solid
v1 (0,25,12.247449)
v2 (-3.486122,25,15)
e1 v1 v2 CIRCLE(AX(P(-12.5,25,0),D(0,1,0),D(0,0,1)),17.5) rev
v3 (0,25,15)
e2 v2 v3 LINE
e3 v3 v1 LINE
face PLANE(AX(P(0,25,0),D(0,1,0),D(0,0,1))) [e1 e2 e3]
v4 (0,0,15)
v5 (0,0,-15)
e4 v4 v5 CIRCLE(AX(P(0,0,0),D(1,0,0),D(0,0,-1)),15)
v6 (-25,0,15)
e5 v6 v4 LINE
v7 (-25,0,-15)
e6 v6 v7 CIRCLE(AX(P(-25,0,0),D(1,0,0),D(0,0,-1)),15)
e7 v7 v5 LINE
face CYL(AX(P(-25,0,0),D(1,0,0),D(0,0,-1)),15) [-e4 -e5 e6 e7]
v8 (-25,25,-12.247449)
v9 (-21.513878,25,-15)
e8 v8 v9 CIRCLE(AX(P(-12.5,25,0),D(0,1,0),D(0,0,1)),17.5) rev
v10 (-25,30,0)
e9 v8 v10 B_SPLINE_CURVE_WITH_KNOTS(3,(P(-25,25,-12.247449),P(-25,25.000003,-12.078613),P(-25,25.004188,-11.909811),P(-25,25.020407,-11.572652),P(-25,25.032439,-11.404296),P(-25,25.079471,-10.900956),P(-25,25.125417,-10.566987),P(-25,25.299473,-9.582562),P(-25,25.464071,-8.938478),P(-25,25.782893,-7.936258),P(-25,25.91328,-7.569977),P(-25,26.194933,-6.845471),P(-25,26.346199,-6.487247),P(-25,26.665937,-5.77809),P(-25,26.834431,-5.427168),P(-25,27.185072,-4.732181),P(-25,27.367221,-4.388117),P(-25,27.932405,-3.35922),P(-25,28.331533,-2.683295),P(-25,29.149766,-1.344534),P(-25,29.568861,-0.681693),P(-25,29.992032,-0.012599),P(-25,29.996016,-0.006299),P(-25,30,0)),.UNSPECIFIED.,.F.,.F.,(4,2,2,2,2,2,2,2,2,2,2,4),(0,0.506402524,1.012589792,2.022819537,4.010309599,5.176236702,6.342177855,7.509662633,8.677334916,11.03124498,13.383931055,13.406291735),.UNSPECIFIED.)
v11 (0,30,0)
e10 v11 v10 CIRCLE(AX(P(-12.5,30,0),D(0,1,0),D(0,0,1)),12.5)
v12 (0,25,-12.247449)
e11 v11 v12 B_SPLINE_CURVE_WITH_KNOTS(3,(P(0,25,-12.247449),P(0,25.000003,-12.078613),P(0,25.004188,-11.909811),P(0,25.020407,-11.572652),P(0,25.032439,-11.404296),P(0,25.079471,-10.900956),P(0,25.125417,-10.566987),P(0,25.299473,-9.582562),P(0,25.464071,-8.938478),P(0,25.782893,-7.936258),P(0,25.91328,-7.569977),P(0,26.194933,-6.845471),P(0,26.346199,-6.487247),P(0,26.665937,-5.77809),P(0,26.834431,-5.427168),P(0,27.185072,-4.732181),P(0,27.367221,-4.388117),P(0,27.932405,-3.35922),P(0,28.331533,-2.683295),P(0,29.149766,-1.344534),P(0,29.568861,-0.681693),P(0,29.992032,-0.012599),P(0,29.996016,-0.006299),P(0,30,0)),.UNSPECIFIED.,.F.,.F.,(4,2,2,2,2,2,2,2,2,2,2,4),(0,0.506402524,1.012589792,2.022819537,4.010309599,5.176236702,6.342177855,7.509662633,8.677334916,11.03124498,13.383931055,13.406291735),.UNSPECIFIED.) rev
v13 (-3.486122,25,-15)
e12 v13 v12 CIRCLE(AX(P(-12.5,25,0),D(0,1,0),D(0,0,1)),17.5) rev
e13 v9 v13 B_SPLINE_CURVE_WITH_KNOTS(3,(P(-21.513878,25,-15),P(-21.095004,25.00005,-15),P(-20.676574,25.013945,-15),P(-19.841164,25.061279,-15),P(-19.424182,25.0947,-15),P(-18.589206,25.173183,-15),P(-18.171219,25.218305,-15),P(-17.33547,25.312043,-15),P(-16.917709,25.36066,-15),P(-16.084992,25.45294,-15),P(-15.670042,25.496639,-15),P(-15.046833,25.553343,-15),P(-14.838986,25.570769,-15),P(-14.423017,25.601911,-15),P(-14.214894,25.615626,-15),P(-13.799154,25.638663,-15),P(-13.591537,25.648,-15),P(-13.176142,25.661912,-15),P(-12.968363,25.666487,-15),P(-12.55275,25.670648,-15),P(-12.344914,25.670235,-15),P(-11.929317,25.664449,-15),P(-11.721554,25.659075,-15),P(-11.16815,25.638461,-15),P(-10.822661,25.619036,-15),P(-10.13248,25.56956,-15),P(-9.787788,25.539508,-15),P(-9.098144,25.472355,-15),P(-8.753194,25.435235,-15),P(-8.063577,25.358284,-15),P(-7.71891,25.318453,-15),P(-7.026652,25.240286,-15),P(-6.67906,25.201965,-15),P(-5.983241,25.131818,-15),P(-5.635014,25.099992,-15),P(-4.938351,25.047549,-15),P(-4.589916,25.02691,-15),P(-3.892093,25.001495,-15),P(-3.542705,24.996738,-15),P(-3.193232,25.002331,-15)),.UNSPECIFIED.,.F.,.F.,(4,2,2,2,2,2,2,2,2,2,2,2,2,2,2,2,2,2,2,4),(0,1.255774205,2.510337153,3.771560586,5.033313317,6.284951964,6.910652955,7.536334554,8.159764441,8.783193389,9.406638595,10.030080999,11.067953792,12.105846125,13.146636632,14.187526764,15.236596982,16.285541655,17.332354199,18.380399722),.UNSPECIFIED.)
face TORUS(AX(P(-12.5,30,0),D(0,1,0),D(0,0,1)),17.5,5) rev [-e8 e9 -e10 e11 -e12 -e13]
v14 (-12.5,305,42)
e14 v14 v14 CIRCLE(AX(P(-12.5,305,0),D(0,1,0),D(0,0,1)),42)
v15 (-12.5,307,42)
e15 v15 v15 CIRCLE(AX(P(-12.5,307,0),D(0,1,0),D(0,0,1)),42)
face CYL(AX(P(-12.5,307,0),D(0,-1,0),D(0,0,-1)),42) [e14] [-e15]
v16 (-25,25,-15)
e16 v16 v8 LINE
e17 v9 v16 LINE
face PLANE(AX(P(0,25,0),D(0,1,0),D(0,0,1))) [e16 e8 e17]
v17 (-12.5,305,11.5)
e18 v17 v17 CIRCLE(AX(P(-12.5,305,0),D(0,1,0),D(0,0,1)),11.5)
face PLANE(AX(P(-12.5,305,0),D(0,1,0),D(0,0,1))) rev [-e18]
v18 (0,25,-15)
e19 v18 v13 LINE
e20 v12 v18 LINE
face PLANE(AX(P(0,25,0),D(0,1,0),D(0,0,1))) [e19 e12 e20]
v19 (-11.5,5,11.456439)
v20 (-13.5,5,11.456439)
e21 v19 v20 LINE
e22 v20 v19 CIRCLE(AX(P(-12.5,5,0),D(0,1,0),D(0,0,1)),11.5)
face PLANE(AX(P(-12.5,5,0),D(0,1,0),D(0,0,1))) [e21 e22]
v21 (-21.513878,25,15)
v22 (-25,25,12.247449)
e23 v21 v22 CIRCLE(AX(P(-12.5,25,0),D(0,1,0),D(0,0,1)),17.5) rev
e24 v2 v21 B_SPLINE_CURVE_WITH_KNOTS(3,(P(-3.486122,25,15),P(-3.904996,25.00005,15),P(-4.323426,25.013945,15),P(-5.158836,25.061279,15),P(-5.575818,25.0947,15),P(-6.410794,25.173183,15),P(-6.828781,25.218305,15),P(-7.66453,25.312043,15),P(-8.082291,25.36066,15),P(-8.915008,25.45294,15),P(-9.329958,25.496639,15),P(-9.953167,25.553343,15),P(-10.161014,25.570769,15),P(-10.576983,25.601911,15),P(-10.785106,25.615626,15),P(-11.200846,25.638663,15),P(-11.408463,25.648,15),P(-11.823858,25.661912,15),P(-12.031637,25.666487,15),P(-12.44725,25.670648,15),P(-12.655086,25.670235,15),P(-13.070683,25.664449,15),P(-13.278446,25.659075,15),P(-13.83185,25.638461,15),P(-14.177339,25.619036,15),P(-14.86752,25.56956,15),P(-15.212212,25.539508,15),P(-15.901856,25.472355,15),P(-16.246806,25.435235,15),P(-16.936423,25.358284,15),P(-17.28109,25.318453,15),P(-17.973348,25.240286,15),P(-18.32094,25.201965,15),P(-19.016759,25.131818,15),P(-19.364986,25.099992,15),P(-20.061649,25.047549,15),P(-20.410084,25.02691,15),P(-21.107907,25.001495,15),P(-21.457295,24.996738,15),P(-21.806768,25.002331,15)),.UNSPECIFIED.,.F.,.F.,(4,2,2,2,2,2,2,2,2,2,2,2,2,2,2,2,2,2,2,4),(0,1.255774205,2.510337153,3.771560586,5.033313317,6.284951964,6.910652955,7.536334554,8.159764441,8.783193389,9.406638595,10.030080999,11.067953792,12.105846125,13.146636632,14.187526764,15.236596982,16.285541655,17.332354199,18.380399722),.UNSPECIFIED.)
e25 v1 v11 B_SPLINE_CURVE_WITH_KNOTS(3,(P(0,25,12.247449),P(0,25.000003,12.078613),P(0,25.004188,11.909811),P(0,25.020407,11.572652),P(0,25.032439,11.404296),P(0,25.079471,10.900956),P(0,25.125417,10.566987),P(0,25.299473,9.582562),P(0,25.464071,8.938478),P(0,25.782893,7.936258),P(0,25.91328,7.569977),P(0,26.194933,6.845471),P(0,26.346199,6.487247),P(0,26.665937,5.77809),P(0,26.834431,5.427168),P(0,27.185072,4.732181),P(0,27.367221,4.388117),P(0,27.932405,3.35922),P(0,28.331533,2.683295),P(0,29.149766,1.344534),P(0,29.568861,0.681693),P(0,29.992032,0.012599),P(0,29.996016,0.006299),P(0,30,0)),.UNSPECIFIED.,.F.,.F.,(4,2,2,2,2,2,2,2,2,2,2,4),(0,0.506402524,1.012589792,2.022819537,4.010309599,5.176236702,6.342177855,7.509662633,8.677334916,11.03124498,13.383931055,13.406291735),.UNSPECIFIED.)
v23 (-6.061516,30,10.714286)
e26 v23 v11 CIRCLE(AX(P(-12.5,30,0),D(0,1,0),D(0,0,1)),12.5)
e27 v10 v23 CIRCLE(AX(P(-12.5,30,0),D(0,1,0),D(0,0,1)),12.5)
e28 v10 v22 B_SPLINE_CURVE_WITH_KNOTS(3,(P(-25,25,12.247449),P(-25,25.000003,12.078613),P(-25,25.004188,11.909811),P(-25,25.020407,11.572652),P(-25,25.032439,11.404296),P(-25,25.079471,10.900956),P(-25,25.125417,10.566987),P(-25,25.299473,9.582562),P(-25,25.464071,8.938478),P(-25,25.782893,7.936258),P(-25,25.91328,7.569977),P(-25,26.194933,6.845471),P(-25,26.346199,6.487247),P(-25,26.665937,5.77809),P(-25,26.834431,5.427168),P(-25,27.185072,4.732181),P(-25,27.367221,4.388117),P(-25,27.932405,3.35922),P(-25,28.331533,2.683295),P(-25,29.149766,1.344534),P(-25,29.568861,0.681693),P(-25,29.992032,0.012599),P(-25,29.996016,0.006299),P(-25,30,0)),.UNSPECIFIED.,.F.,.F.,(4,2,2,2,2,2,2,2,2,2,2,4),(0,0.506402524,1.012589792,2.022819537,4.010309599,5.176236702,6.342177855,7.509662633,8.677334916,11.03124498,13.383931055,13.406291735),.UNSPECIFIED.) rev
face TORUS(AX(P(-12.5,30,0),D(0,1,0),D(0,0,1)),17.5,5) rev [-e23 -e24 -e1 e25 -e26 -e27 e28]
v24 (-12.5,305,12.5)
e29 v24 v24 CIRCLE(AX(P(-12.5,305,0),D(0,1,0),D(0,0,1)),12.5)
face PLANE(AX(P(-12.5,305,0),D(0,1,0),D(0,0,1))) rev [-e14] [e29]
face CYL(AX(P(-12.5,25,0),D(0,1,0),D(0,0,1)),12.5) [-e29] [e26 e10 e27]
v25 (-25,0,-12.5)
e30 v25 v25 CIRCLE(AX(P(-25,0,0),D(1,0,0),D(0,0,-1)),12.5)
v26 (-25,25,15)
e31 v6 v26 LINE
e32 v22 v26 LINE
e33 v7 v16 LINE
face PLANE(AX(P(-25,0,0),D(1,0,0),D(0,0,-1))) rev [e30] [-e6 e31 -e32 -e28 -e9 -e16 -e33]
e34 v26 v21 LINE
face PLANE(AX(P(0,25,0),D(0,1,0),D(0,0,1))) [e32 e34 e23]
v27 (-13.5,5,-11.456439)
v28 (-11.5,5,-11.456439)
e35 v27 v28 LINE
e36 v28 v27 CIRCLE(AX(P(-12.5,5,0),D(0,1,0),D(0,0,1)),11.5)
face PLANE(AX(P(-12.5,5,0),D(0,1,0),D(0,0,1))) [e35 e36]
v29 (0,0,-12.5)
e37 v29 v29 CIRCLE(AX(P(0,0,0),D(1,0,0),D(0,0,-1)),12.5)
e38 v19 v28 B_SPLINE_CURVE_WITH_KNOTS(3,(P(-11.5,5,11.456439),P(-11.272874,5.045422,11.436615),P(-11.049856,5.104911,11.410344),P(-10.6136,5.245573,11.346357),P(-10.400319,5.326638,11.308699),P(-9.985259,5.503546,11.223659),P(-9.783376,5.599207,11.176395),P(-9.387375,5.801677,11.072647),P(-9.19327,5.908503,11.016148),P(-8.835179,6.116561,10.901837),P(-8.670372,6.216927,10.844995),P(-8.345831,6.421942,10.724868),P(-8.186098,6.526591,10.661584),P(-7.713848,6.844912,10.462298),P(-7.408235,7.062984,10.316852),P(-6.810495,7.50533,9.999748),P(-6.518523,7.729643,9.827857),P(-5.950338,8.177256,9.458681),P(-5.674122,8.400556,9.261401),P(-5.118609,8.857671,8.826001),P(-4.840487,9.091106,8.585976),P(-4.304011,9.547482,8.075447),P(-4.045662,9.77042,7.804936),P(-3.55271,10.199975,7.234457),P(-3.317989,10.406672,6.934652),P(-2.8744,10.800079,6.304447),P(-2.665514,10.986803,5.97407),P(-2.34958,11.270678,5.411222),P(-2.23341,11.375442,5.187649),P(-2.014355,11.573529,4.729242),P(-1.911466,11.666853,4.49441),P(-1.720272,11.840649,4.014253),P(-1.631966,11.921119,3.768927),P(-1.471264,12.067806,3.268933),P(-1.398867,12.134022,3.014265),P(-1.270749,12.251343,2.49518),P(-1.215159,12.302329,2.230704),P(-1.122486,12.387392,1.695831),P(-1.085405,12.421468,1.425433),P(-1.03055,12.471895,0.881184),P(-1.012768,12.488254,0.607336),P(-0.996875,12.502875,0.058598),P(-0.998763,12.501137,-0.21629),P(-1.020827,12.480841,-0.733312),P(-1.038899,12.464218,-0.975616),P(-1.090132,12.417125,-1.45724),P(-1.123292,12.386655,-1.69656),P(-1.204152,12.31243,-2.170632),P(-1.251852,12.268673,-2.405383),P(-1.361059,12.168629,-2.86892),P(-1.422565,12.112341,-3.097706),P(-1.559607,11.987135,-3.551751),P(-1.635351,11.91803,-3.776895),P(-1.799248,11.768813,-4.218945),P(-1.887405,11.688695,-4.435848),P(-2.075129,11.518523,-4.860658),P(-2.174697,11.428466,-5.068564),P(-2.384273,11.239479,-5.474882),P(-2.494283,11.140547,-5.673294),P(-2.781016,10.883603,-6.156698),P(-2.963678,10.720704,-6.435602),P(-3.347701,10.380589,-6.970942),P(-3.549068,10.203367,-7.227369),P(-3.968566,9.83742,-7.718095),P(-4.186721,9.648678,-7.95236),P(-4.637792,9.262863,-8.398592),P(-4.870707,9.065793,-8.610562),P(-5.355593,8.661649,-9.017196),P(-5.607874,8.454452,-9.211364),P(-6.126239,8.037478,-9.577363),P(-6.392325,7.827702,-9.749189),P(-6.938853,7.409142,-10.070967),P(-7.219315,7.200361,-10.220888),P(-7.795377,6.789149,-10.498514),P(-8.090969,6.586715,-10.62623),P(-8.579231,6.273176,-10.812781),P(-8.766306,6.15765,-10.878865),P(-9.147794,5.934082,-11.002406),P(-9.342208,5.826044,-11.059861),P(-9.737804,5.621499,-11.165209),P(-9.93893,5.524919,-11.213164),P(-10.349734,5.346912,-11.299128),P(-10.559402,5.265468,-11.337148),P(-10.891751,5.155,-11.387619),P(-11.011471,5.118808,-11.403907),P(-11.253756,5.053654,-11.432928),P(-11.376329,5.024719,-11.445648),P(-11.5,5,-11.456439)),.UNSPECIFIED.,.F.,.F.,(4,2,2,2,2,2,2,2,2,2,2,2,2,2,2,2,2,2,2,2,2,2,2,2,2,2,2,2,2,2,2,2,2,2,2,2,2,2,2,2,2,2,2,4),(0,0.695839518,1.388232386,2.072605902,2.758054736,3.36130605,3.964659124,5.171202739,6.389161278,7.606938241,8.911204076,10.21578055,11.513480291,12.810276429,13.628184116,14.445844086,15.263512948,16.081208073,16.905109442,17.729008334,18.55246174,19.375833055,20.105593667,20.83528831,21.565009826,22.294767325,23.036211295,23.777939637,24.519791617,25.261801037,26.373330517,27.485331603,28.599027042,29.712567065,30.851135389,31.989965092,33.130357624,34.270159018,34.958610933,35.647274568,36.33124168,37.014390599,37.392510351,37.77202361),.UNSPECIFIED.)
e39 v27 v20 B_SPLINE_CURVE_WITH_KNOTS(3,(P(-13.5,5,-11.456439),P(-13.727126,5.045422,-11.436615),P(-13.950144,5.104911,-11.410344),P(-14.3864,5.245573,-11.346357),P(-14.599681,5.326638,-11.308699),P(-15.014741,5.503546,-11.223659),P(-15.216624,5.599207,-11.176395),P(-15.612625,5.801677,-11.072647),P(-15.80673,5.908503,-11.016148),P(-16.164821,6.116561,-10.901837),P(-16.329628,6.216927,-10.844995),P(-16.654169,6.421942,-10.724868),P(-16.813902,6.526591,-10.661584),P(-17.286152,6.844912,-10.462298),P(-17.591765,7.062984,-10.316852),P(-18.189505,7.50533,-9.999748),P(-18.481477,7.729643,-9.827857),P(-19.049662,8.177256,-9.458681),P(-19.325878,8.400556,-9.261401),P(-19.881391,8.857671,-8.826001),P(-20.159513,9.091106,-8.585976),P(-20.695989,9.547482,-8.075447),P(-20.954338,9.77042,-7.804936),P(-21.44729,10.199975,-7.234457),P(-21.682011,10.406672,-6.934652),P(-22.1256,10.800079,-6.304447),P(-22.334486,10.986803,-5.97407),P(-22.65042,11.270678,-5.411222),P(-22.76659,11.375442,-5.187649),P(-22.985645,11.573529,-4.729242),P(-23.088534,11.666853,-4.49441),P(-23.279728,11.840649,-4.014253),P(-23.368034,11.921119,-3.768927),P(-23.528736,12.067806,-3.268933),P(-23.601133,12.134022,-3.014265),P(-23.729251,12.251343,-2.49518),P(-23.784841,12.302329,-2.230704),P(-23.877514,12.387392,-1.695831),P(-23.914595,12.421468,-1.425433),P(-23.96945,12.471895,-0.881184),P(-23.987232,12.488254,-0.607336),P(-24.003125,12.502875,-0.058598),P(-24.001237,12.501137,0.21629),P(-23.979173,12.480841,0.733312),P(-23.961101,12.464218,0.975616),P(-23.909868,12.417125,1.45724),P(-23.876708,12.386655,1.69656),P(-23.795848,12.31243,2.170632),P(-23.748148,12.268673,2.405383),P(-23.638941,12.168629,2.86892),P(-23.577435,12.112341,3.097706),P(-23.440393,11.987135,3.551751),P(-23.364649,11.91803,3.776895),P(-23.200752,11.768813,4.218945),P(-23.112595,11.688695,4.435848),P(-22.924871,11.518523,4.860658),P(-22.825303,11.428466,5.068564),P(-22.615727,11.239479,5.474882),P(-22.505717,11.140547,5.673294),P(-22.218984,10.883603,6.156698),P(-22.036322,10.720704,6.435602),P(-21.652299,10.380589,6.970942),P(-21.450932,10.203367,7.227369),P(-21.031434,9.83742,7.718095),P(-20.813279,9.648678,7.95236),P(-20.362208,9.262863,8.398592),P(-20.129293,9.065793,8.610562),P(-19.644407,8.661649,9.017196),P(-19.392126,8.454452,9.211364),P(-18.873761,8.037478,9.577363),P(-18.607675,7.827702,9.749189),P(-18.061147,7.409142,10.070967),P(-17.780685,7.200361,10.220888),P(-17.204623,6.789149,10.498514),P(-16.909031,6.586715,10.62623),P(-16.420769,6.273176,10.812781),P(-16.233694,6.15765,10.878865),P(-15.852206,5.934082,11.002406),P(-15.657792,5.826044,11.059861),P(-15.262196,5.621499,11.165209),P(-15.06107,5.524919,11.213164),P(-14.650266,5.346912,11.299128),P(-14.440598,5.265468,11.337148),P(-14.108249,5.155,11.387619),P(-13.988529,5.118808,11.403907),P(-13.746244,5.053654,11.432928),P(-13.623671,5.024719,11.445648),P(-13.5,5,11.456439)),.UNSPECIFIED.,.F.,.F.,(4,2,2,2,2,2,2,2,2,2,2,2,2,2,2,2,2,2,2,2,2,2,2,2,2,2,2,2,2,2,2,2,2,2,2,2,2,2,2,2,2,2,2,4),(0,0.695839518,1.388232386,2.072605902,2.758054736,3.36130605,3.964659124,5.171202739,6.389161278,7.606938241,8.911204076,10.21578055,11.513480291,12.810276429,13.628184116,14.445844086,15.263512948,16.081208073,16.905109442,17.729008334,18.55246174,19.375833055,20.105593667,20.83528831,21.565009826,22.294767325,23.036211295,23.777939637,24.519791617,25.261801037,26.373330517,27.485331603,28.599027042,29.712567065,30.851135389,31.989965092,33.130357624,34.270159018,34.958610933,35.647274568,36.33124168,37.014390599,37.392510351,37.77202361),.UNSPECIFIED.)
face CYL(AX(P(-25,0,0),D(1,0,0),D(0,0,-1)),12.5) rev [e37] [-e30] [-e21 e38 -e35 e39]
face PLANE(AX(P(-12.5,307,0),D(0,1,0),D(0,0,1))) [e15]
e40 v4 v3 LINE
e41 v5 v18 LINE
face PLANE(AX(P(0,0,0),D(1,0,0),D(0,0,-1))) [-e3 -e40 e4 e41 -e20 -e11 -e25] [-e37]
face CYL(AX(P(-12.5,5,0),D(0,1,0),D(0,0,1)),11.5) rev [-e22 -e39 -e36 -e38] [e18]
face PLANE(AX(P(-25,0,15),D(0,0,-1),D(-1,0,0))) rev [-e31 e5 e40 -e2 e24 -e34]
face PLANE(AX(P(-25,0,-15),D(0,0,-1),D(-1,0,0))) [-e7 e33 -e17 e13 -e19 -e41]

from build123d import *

# Parameters (mm, degrees)
SKETCH1_R           = 15
SKETCH1_R_2         = 12.5
BOSS_EXTRUDE1_DEPTH = 25
CUT_EXTRUDE1_DEPTH  = 280
FILLET1_R           = 5
FILLET2_R           = 5
SKETCH3_R           = 11.5
CUT_EXTRUDE2_DEPTH  = 300
SKETCH4_R           = 42
BOSS_EXTRUDE2_DEPTH = 2


with BuildPart() as part:
    # Sketch1 → Boss-Extrude1 (new body)
    # profile 1 of 2: a face of its own
    with BuildSketch(Plane(origin=(0, 0, 0), x_dir=(0, 0, -1), z_dir=(1, 0, 0))):
        with BuildLine():
            ThreePointArc((-15, 0), (0, 15), (15, 0))
            Line((15, 0), (15, 305))
            Line((15, 305), (-15, 305))
            Line((-15, 305), (-15, 0))
        make_face()
    # profile 2 of 2: a face of its own
    with BuildSketch(Plane(origin=(0, 0, 0), x_dir=(0, 0, -1), z_dir=(1, 0, 0))):
        Circle(SKETCH1_R)
        Circle(SKETCH1_R_2, mode=Mode.SUBTRACT)
    extrude(amount=-BOSS_EXTRUDE1_DEPTH)

    # Sketch2 → Cut-Extrude1 (cut)
    with BuildSketch(Plane(origin=(0, 305, 0), x_dir=(1, 0, 0), z_dir=(0, 1, 0))):
        with BuildLine():
            Line((0, -15), (0, 0))
            ThreePointArc((0, 0), (-12.5, -12.5), (-25, 0))
            Line((-25, 0), (-25, -15))
            Line((-25, -15), (0, -15))
        make_face()
        with BuildLine():
            ThreePointArc((-25, 0), (-12.5, 12.5), (0, 0))
            Line((0, 0), (0, 15))
            Line((0, 15), (-25, 15))
            Line((-25, 15), (-25, 0))
        make_face()
    extrude(amount=-CUT_EXTRUDE1_DEPTH, mode=Mode.SUBTRACT)

    # Fillet1
    # the kernel refuses this fillet: 5 mm, written as the material it adds along each edge
    with BuildSketch(Plane(origin=(-12.5, 25, 0), x_dir=(1, 0, 0), z_dir=(0, 0, -1))) as fillet1_piece_1_section:
        with BuildLine():
            CenterArc((12.5 + FILLET1_R, -FILLET1_R), FILLET1_R, 90, 90)
            Line((12.5, -FILLET1_R), (12.5, 0))
            Line((12.5, 0), (12.5 + FILLET1_R, 0))
        make_face()
    fillet1_piece_1 = revolve(axis=Axis((-12.5, 25, 0), (0, -1, 0)), revolution_arc=180, mode=Mode.PRIVATE)
    fillet1_piece_1 = split(fillet1_piece_1, bisect_by=Plane(origin=(-12.5, 26.425263387, 15), z_dir=(0, 0, -1)), keep=Keep.TOP, mode=Mode.PRIVATE)
    fillet1_piece_1 = split(fillet1_piece_1, bisect_by=Plane(origin=(-25, 26.425263387, 13.925263387), z_dir=(1, 0, 0)), keep=Keep.TOP, mode=Mode.PRIVATE)
    fillet1_piece_1 = split(fillet1_piece_1, bisect_by=Plane(origin=(0, 26.425263387, 13.925263387), z_dir=(-1, 0, 0)), keep=Keep.TOP, mode=Mode.PRIVATE)
    add(fillet1_piece_1)

    # Fillet2
    # the kernel refuses this fillet: 5 mm, written as the material it adds along each edge
    with BuildSketch(Plane(origin=(-12.5, 25, 0), x_dir=(-0.5389483633149527, 0, 0.8423388045674577), z_dir=(0.8423388045674577, 0, 0.5389483633149527))) as fillet2_piece_1_section:
        with BuildLine():
            CenterArc((12.5 + FILLET2_R, -FILLET2_R), FILLET2_R, 90, 90)
            Line((12.5 + FILLET2_R, 0), (12.5, 0))
            Line((12.5, 0), (12.5, -FILLET2_R))
        make_face()
    fillet2_piece_1 = revolve(axis=Axis((-12.5, 25, 0), (0, -1, 0)), revolution_arc=294.775843921, mode=Mode.PRIVATE)
    fillet2_piece_1 = split(fillet2_piece_1, bisect_by=Plane(origin=(-25, 27.5000003, -12.555440979), z_dir=(1, 0, 0)), keep=Keep.TOP, mode=Mode.PRIVATE)
    fillet2_piece_1 = split(fillet2_piece_1, bisect_by=Plane(origin=(0, 27.5000003, -12.555440979), z_dir=(-1, 0, 0)), keep=Keep.TOP, mode=Mode.PRIVATE)
    fillet2_piece_1 = split(fillet2_piece_1, bisect_by=Plane(origin=(-12.5, 27.5000003, -15), z_dir=(0, 0, 1)), keep=Keep.TOP, mode=Mode.PRIVATE)
    add(fillet2_piece_1)

    # Sketch3 → Cut-Extrude2 (cut)
    with BuildSketch(Plane(origin=(0, 305, 0), x_dir=(1, 0, 0), z_dir=(0, 1, 0))):
        with Locations(Location((-12.5, 0, 0), (0, 0, 270))):
            Circle(SKETCH3_R)
    extrude(amount=-CUT_EXTRUDE2_DEPTH, mode=Mode.SUBTRACT)

    # Sketch4 → Boss-Extrude2 (add)
    with BuildSketch(Plane(origin=(0, 305, 0), x_dir=(1, 0, 0), z_dir=(0, 1, 0))):
        with Locations(Location((-12.5, 0, 0), (0, 0, 270))):
            Circle(SKETCH4_R)
    extrude(amount=BOSS_EXTRUDE2_DEPTH)


solid = part.part
